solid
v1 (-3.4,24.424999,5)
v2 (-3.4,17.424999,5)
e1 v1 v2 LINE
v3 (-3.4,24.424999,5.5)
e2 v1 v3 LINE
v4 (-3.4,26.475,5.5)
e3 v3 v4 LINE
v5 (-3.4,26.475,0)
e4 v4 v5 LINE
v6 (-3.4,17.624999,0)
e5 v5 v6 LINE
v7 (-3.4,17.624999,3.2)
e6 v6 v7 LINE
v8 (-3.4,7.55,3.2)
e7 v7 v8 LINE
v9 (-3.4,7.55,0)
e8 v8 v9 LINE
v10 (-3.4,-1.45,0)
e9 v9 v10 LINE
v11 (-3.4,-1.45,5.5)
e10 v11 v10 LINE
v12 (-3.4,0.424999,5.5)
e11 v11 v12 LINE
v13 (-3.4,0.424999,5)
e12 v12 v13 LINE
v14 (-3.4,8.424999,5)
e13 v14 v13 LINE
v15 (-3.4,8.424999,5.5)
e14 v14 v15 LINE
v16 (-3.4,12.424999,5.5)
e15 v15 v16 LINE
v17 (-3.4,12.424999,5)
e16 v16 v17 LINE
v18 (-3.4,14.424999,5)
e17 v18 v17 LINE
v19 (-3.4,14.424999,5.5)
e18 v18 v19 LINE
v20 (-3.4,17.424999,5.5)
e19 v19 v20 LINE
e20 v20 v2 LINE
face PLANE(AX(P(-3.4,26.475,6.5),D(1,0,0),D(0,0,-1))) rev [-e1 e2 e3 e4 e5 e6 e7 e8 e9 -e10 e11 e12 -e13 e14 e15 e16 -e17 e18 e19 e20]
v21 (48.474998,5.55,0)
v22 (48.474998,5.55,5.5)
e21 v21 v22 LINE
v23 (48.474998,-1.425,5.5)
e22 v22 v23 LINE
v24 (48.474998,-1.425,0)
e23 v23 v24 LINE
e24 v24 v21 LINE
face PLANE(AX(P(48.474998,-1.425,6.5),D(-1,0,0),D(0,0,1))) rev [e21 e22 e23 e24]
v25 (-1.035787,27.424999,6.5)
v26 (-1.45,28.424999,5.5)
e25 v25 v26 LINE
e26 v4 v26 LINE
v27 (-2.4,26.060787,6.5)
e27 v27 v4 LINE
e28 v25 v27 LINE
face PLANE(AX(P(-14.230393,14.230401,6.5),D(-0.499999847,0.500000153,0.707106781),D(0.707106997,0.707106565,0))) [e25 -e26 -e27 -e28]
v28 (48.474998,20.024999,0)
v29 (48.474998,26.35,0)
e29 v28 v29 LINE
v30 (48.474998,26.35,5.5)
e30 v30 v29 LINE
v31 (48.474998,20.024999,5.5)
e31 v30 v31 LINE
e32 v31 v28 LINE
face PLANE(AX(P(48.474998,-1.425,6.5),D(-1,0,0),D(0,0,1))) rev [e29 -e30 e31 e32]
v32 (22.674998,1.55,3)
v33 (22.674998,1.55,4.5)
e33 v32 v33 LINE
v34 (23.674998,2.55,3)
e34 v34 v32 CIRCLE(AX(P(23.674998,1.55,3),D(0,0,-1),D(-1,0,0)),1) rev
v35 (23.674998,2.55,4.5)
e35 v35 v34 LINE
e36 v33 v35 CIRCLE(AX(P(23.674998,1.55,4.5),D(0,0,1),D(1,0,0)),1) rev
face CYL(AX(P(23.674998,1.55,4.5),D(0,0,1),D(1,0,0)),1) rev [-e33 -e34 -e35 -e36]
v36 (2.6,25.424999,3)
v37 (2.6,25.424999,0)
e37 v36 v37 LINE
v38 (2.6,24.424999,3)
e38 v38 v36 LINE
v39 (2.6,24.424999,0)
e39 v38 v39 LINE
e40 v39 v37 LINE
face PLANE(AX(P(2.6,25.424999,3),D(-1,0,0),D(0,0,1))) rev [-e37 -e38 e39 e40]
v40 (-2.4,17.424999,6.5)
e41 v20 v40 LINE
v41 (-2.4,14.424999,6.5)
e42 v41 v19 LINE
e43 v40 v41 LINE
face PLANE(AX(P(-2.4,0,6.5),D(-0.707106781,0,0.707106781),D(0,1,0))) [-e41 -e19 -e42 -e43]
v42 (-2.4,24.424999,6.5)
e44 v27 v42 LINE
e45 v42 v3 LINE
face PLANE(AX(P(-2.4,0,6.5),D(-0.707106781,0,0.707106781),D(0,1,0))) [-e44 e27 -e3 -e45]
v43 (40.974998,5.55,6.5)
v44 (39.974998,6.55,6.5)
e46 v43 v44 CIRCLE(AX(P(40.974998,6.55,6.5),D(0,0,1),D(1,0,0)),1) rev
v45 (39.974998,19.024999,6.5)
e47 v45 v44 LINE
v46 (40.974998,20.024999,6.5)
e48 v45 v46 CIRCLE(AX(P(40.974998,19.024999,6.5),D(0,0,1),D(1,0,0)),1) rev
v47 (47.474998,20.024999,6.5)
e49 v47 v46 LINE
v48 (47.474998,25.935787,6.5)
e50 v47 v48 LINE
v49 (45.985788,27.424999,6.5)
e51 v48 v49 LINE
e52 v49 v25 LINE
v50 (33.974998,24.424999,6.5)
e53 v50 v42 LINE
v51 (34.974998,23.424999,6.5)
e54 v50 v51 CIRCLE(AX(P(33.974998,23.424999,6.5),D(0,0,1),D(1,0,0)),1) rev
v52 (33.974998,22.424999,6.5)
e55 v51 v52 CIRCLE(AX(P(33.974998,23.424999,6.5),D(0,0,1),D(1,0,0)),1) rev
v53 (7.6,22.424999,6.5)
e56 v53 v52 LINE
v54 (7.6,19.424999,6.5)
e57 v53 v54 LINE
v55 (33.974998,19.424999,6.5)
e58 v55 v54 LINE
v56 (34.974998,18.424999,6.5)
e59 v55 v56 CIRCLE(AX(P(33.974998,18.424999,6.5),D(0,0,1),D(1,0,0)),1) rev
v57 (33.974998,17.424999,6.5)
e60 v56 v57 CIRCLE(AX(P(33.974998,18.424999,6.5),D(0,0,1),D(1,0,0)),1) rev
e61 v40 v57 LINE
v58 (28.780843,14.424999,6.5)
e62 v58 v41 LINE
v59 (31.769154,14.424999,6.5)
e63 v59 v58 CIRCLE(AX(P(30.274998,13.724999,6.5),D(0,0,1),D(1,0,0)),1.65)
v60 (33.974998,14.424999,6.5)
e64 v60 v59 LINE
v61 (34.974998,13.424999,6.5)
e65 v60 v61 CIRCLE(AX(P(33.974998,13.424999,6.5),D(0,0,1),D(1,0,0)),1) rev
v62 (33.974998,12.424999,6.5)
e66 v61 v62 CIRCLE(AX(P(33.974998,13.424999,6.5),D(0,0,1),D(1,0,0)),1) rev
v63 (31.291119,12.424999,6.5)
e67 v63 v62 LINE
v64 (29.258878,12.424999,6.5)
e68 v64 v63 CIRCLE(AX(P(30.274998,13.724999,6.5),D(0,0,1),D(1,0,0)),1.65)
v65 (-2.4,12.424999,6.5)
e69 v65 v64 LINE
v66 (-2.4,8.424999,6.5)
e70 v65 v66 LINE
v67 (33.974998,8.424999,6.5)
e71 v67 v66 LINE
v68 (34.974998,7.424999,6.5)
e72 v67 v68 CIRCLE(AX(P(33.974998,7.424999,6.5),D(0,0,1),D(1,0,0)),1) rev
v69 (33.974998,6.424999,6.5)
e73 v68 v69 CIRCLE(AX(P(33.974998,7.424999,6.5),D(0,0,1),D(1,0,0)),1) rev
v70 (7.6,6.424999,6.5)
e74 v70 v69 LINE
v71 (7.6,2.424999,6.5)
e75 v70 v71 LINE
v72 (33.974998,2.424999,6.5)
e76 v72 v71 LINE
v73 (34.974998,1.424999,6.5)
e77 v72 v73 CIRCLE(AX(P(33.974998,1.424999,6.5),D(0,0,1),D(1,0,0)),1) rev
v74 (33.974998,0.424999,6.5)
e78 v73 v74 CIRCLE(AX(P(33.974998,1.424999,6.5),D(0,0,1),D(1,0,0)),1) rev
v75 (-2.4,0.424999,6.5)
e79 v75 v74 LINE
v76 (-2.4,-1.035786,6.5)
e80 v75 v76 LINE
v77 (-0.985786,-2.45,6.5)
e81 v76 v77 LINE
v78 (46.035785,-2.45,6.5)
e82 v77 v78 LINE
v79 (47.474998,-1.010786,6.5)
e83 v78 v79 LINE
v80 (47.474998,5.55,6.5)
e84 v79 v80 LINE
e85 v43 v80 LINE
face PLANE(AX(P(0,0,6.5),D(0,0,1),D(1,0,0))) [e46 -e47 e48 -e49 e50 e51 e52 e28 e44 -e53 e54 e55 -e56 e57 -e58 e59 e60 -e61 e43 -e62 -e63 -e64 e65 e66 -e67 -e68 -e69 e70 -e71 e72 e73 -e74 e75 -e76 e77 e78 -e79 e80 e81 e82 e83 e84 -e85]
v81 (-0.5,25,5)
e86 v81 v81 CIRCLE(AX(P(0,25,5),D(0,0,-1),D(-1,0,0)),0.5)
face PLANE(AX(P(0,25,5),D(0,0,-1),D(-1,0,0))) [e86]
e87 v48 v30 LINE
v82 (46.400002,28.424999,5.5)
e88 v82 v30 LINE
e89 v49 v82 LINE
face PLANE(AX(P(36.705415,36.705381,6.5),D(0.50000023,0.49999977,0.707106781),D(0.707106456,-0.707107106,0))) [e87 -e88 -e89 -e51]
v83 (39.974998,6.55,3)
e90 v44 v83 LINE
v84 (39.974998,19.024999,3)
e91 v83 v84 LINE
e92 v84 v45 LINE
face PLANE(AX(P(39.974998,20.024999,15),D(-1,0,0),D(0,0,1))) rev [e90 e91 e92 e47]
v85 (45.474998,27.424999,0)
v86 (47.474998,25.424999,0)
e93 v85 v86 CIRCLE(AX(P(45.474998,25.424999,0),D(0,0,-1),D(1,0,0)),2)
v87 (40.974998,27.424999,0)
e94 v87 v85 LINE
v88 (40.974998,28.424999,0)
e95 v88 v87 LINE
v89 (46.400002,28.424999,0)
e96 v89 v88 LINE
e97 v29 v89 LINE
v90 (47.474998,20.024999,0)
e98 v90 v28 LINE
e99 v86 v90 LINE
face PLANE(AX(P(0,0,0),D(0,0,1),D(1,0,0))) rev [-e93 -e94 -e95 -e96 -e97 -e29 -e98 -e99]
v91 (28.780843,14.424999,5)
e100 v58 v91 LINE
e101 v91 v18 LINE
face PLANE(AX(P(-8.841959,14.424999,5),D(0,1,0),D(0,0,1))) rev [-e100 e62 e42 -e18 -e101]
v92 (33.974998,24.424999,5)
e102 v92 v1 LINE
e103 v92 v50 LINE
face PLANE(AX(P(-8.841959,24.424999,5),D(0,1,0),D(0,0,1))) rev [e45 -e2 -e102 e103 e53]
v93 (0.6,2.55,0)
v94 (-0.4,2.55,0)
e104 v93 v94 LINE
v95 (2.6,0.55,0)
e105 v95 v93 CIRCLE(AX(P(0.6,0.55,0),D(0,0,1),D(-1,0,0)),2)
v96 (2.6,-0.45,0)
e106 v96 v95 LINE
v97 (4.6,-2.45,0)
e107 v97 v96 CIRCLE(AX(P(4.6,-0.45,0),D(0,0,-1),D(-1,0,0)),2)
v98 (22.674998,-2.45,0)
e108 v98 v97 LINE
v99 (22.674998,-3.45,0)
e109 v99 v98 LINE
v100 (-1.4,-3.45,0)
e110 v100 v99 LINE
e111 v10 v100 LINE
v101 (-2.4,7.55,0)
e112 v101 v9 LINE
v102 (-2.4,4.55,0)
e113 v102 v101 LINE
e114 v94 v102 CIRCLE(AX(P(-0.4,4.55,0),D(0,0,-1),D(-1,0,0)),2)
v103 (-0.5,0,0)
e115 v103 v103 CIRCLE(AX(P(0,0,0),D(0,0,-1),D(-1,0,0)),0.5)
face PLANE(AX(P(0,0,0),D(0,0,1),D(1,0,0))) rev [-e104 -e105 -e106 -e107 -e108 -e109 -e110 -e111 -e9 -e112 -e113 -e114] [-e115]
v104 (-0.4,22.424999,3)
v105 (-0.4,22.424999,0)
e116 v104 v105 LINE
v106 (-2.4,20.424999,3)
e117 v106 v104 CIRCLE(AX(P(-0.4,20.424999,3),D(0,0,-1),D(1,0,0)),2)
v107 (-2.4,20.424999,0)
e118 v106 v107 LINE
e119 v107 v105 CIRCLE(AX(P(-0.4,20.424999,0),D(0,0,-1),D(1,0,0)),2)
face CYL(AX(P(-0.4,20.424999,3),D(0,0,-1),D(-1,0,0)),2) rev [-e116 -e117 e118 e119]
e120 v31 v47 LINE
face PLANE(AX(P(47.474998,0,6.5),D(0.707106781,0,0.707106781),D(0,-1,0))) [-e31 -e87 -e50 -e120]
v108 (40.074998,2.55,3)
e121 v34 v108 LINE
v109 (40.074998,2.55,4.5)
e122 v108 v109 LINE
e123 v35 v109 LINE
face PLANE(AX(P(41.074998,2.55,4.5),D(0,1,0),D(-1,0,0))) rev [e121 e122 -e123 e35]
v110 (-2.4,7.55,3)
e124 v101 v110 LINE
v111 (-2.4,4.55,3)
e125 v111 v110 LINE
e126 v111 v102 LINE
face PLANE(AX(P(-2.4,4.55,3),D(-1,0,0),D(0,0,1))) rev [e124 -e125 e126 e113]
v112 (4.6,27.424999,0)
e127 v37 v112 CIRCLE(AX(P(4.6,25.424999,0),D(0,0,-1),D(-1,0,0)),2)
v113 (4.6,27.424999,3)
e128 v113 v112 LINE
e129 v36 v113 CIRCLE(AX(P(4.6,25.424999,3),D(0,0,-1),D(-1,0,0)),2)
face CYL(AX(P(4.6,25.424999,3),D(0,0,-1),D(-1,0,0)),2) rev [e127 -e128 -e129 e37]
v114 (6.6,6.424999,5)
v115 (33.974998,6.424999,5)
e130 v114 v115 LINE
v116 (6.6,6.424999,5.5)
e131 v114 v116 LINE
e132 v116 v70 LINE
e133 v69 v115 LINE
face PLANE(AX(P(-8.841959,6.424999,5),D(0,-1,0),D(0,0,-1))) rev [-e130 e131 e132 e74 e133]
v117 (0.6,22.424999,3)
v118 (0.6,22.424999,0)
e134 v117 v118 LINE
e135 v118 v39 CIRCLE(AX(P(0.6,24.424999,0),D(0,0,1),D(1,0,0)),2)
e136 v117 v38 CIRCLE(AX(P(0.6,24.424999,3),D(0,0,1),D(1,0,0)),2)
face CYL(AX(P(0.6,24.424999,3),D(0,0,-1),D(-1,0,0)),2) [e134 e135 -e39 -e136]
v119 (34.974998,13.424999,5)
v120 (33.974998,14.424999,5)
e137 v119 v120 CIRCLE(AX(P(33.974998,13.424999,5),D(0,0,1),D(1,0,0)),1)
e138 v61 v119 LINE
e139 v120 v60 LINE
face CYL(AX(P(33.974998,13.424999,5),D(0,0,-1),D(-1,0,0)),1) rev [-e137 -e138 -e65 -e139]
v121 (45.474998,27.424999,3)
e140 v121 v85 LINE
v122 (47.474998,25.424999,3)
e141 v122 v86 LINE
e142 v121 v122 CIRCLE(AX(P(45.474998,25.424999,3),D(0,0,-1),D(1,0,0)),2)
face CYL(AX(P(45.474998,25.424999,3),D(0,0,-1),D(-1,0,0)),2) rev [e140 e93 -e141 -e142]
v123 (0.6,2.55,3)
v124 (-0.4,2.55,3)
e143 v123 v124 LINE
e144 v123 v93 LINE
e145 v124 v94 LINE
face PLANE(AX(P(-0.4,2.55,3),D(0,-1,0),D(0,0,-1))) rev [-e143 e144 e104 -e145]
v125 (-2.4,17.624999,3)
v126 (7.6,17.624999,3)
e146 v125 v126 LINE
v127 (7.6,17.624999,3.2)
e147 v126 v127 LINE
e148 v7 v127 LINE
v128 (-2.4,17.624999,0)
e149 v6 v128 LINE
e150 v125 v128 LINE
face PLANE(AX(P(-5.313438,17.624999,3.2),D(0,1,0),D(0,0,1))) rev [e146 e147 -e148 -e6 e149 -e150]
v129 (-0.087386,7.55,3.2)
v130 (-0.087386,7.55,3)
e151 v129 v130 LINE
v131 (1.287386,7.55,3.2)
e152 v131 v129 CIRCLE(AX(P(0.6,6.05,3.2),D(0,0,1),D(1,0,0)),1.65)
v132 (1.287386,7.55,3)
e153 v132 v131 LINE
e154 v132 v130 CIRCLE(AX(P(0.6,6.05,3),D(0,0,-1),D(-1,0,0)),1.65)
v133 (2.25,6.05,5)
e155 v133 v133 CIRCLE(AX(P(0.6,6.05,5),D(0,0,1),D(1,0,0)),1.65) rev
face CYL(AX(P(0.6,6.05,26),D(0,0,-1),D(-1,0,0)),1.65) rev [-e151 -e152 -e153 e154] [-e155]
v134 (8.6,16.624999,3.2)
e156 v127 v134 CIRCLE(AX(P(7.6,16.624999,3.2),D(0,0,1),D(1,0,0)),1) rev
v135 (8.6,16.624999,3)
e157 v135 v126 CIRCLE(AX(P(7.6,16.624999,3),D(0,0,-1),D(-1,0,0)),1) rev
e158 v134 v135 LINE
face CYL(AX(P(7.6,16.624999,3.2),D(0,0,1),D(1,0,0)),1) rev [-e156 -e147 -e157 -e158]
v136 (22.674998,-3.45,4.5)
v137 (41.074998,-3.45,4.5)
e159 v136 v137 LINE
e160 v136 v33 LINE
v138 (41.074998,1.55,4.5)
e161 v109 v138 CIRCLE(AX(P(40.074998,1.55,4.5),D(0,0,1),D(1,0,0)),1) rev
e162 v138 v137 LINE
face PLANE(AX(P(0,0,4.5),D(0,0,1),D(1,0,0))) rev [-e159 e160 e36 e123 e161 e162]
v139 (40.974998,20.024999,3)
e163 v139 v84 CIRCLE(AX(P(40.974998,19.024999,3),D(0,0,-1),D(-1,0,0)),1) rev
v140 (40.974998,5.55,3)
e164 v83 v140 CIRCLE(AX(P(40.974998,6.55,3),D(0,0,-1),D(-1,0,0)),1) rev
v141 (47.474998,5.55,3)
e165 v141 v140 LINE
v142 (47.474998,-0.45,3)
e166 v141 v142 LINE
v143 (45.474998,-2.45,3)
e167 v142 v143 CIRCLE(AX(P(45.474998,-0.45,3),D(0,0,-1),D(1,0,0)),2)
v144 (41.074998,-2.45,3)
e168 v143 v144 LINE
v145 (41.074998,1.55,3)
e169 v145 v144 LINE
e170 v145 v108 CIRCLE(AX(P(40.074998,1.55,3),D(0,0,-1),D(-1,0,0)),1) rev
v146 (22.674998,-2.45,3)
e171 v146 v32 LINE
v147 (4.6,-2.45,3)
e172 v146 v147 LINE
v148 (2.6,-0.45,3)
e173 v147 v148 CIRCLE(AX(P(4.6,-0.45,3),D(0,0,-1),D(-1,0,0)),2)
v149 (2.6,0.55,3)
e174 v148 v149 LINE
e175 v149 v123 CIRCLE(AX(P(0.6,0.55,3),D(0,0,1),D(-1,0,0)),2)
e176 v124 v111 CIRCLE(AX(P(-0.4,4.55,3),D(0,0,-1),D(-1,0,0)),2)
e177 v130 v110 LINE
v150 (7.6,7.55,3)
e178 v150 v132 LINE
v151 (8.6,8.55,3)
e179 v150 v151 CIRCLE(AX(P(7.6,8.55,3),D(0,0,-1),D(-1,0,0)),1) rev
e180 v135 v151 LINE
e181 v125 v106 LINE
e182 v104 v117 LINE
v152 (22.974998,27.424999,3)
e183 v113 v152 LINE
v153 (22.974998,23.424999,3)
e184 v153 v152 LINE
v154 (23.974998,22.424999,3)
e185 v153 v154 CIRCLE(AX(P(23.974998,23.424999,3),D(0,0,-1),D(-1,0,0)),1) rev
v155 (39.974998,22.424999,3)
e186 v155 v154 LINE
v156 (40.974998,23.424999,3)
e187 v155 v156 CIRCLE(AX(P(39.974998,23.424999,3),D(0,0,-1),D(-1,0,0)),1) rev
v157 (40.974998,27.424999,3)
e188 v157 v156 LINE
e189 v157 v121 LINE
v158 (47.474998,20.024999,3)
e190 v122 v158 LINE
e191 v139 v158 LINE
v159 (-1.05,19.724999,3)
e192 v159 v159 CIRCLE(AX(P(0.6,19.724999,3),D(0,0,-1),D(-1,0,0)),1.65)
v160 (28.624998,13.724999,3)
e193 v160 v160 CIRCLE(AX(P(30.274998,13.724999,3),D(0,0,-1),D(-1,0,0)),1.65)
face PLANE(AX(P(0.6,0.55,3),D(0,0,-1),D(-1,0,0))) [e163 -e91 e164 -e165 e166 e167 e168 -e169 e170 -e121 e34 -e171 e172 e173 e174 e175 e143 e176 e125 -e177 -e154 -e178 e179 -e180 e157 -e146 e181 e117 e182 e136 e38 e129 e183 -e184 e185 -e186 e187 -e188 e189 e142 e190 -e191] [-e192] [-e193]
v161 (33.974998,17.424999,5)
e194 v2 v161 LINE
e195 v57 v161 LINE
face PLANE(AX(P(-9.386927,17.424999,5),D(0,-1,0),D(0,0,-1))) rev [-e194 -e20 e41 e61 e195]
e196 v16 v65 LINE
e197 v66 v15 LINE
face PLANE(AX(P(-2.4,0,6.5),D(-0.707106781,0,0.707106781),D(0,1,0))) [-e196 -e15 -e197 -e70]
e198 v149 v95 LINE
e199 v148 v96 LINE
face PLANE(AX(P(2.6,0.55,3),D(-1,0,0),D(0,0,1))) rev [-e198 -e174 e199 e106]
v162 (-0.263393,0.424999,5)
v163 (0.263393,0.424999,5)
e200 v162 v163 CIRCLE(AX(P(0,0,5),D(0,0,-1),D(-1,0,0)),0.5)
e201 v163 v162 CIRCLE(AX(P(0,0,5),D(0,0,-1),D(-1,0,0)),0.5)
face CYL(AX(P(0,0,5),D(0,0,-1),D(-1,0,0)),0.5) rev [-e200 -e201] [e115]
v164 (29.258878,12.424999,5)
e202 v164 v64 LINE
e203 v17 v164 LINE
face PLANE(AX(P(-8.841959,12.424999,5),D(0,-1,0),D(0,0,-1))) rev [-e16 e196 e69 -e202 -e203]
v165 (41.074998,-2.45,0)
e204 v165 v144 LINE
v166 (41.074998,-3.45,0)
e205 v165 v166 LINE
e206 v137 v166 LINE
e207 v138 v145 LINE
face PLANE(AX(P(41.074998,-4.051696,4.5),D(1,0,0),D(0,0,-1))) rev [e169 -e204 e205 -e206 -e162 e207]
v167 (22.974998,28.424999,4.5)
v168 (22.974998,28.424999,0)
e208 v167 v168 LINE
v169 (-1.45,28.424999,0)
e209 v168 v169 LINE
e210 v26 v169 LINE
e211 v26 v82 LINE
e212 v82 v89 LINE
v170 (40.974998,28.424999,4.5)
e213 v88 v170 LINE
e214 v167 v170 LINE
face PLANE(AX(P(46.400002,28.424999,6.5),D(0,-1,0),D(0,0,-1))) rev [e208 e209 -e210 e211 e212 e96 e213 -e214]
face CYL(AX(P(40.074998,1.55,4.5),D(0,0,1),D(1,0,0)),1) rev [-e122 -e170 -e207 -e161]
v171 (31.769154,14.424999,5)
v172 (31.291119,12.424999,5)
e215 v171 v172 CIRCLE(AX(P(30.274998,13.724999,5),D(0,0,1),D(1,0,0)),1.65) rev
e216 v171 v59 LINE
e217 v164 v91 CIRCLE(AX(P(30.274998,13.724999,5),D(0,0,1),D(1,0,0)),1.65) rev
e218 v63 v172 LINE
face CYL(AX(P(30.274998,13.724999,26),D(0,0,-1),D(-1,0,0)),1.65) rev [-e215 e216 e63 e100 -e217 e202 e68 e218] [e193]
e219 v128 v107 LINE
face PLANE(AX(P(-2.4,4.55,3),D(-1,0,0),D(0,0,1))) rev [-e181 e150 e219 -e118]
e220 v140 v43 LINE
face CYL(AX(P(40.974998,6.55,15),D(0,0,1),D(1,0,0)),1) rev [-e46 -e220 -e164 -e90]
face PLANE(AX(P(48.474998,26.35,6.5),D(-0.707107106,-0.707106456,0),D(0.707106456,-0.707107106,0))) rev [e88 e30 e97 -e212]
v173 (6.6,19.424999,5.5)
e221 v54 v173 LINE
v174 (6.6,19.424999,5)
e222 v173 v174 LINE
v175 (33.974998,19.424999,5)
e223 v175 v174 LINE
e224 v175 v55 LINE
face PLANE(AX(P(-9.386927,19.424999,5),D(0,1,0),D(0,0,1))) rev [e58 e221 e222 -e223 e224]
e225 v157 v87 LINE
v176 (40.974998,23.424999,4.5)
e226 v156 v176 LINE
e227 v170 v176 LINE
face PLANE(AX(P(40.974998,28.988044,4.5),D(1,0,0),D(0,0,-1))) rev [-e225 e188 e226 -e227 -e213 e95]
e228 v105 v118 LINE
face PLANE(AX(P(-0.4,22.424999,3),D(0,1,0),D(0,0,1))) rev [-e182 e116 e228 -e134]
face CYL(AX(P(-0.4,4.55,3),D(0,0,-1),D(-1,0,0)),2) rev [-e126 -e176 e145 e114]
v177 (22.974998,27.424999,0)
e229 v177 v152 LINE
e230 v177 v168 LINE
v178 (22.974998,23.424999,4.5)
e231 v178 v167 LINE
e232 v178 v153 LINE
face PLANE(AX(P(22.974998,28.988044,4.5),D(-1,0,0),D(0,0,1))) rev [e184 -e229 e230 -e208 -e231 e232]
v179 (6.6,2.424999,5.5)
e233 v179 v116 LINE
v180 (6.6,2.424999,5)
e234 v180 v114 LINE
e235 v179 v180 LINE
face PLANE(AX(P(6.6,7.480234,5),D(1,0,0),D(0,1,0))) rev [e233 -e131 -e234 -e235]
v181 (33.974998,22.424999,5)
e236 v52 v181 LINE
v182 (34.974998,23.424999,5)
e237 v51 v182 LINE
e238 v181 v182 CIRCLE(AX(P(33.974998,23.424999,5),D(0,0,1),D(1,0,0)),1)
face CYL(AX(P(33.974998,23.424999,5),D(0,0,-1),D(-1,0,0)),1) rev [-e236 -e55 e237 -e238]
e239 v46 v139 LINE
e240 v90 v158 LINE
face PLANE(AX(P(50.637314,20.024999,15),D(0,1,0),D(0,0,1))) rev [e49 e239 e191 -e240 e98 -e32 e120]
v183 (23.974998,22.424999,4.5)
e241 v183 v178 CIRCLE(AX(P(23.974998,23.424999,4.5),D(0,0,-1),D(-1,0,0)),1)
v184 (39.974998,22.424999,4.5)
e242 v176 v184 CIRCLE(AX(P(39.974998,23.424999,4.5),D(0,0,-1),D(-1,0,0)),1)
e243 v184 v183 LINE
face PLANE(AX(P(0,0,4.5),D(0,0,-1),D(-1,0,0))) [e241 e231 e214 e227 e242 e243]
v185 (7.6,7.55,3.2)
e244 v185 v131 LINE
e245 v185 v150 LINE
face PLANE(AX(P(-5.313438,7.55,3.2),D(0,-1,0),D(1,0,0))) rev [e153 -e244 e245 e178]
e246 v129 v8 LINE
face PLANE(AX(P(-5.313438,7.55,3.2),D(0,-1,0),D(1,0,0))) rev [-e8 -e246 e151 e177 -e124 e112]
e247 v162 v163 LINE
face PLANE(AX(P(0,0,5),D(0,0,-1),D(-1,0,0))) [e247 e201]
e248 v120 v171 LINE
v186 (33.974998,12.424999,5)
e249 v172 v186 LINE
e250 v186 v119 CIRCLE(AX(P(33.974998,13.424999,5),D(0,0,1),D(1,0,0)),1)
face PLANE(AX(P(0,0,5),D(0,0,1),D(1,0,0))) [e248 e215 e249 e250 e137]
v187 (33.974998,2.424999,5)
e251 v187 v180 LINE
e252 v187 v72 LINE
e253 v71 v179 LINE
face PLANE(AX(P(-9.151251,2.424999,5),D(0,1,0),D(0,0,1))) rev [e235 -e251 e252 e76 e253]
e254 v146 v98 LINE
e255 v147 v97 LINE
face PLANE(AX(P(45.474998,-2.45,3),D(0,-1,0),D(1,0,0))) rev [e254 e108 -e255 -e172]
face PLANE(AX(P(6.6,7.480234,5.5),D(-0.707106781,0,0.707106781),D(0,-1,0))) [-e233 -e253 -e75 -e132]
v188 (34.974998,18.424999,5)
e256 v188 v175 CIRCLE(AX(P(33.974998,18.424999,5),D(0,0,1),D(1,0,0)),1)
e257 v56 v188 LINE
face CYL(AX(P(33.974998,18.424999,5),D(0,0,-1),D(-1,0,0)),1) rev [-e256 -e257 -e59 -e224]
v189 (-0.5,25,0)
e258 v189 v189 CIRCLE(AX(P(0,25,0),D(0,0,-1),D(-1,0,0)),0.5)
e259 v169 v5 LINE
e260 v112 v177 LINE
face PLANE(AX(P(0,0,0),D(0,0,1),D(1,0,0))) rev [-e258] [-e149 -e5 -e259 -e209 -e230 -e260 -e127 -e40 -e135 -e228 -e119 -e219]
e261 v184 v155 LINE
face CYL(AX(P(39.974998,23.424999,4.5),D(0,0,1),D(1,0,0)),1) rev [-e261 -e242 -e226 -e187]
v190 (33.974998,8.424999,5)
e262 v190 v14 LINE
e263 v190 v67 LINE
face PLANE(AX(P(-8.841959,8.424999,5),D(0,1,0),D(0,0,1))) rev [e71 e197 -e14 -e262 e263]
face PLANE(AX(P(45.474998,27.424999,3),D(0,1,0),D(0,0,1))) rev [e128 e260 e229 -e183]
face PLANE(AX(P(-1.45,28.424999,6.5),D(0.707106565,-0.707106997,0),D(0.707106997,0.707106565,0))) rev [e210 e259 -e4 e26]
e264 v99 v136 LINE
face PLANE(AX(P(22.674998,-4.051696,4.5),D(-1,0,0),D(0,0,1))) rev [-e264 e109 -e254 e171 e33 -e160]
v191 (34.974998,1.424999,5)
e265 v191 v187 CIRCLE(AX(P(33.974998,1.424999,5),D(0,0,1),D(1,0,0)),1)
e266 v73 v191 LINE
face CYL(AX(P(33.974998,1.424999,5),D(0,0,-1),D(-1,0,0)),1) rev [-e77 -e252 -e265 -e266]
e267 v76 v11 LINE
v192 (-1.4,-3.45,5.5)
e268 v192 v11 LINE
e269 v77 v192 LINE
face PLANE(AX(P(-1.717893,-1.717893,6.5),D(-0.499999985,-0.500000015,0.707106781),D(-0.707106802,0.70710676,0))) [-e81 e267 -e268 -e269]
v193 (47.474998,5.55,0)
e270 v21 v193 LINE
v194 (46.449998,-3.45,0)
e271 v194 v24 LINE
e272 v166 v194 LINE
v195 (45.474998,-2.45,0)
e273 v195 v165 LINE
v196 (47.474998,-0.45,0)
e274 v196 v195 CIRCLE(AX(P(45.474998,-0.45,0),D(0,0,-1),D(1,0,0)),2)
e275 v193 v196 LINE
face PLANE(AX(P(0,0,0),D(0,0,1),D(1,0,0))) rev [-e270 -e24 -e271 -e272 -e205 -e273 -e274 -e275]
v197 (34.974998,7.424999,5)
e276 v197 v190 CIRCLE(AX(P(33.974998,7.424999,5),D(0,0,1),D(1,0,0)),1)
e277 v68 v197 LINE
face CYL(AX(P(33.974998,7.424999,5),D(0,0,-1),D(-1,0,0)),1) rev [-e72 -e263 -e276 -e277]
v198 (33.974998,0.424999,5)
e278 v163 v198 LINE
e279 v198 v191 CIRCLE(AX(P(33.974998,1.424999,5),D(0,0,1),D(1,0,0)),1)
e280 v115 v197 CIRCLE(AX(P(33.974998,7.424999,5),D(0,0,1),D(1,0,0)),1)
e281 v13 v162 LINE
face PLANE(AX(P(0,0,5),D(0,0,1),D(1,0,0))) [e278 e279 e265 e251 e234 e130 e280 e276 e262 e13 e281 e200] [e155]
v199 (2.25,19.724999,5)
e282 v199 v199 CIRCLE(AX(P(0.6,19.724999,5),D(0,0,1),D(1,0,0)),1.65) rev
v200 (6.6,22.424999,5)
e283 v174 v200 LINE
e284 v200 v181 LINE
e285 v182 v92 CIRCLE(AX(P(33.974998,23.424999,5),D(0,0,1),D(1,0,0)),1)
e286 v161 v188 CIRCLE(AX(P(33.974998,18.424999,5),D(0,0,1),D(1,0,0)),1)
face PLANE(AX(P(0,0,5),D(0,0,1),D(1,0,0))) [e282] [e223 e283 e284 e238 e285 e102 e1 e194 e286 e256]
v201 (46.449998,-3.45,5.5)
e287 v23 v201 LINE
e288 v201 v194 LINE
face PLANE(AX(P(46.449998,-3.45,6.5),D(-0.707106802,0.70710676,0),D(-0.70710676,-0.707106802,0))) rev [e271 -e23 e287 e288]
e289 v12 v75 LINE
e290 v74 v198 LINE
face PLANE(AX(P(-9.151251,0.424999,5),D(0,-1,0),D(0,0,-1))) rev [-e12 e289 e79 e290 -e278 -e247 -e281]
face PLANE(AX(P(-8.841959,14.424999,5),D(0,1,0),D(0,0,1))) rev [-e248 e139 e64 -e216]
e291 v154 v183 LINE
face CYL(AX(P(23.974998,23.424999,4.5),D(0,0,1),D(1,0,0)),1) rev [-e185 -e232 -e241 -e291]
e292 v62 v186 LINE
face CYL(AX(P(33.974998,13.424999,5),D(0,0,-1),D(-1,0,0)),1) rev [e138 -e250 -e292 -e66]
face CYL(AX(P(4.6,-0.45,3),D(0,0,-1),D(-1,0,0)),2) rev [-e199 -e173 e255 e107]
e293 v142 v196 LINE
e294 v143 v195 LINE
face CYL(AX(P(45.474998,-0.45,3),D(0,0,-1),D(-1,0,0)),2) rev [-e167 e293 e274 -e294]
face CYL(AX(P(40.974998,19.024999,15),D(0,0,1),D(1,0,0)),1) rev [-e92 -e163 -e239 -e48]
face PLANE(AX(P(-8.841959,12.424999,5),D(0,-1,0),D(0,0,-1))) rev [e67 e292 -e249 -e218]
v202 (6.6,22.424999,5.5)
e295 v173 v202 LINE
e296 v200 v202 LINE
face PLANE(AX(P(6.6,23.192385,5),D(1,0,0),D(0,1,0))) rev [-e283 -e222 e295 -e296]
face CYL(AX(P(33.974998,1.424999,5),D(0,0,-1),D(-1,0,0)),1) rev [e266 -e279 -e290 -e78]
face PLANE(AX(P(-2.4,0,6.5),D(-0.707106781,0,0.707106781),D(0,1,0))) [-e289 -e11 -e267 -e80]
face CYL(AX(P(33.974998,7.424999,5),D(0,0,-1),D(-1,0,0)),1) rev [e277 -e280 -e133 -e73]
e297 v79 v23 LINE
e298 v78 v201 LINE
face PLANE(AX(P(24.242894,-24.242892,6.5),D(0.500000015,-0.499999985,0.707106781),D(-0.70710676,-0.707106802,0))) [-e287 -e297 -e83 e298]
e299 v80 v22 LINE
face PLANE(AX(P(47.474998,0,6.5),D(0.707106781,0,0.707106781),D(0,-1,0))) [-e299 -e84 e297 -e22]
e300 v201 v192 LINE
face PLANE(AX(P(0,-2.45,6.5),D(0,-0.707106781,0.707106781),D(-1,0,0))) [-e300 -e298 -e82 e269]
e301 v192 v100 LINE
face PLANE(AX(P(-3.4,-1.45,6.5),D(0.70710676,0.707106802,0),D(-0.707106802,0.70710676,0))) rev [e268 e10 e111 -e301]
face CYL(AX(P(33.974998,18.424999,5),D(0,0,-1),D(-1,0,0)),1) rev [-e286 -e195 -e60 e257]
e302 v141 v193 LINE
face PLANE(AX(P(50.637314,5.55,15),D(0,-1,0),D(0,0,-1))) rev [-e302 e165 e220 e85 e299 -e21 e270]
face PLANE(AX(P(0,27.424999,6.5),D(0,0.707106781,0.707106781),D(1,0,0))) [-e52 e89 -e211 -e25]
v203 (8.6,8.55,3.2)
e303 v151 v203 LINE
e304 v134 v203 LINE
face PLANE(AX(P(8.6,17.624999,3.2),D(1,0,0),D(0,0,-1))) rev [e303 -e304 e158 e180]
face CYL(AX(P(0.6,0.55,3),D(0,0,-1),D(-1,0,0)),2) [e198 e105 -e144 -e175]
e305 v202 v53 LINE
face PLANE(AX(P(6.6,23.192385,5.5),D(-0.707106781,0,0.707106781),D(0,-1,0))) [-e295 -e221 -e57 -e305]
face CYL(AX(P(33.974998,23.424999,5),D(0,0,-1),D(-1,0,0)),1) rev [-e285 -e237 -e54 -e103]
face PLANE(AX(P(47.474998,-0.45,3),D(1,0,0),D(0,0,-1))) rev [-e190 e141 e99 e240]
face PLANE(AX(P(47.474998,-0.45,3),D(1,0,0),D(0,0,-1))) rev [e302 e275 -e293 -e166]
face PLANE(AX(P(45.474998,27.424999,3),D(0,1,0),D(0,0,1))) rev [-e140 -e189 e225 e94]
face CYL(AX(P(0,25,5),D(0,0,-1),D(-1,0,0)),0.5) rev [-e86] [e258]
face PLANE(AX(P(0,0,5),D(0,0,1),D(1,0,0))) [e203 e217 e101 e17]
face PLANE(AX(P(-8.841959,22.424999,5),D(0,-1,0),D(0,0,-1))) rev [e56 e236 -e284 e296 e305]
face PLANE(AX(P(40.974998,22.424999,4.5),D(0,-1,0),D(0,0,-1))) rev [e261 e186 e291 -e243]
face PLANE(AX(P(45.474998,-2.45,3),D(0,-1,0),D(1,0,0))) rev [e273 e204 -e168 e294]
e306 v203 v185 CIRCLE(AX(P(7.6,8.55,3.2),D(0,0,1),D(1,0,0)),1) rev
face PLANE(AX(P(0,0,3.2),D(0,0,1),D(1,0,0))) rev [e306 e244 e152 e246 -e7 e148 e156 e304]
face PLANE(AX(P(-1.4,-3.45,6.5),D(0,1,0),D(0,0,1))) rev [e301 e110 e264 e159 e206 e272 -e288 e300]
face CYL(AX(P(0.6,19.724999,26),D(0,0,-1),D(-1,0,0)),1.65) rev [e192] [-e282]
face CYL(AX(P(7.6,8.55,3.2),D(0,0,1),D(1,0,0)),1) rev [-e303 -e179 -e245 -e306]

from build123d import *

# Parameters (mm, degrees)
EXTRUDE_2_DEPTH     = 6.5
CUT_EXTRUDE_1_DEPTH = 3
SKETCH_4_R          = 0.5
CUT_EXTRUDE_2_DEPTH = 5
SKETCH_5_W          = 10.662315839
SKETCH_5_H          = 14.474999285
CUT_EXTRUDE_3_DEPTH = 15
SKETCH_6_W          = 18
SKETCH_6_H          = 6.5630452
SKETCH_6_W_2        = 18.4
SKETCH_6_H_2        = 6.601696298
CUT_EXTRUDE_4_DEPTH = 4.5
SKETCH_8_W          = 13.913437684
SKETCH_8_H          = 10.074999285
CUT_EXTRUDE_5_DEPTH = 3.2
SKETCH_9_R          = 1.65
CUT_EXTRUDE_6_DEPTH = 23
CHAMFER_2_SIZE      = 1
FILLET_1_R          = 1
SKETCH_20_W         = 43.816957605
SKETCH_20_H         = 2
SKETCH_20_W_2       = 44.126249409
SKETCH_20_W_3       = 44.36192542
CUT_EXTRUDE_7_DEPTH = 1.5
FILLET_2_R          = 1
SKETCH_21_W         = 13.231285314
SKETCH_21_H         = 4.572576543
SKETCH_21_W_2       = 12.647552139
SKETCH_21_H_2       = 6.080553912
CUT_EXTRUDE_8_DEPTH = 1.5
CHAMFER_3_SIZE      = 1


with BuildPart() as part:
    # Эскиз2 → Бобышка-Вытянуть2 (new body)
    with BuildSketch(Plane.XY):
        Polygon((-1.450000048, 28.424999237), (-3.400000095, 26.475000381), (-3.400000095, -1.450000048), (-1.399999976, -3.450000048), (46.449998499, -3.450000048), (48.474998474, -1.424999952), (48.474998474, 26.350000381), (46.400001526, 28.424999237), align=None)
    extrude(amount=EXTRUDE_2_DEPTH)

    # Эскиз3 → Вырез-Вытянуть1 (cut)
    with BuildSketch(Plane(origin=(0, 0, 0), x_dir=(-1, 0, 0), z_dir=(0, 0, -1))):
        with BuildLine():
            Line((-45.474998474, -2.450000048), (-4.599999905, -2.450000048))
            ThreePointArc((-4.599999905, -2.450000048), (-3.185786342, -1.86421361), (-2.599999905, -0.450000048))
            Line((-2.599999905, -0.450000048), (-2.599999905, 0.549999952))
            ThreePointArc((-2.599999905, 0.549999952), (-2.014213467, 1.964213515), (-0.599999905, 2.549999952))
            Line((-0.599999905, 2.549999952), (0.400000095, 2.549999952))
            ThreePointArc((0.400000095, 2.549999952), (1.814213658, 3.13578639), (2.400000095, 4.549999952))
            Line((2.400000095, 4.549999952), (2.400000095, 20.424999237))
            ThreePointArc((2.400000095, 20.424999237), (1.814213658, 21.839212799), (0.400000095, 22.424999237))
            Line((0.400000095, 22.424999237), (-0.599999905, 22.424999237))
            ThreePointArc((-0.599999905, 22.424999237), (-2.014213467, 23.010785675), (-2.599999905, 24.424999237))
            Line((-2.599999905, 24.424999237), (-2.599999905, 25.424999237))
            ThreePointArc((-2.599999905, 25.424999237), (-3.185786342, 26.839212799), (-4.599999905, 27.424999237))
            Line((-4.599999905, 27.424999237), (-45.474998474, 27.424999237))
            ThreePointArc((-45.474998474, 27.424999237), (-46.889212036, 26.839212799), (-47.474998474, 25.424999237))
            Line((-47.474998474, 25.424999237), (-47.474998474, -0.450000048))
            ThreePointArc((-47.474998474, -0.450000048), (-46.889212036, -1.86421361), (-45.474998474, -2.450000048))
        make_face()
    extrude(amount=-CUT_EXTRUDE_1_DEPTH, mode=Mode.SUBTRACT)

    # Эскиз4 → Вырез-Вытянуть2 (cut)
    with BuildSketch(Plane(origin=(0, 0, 0), x_dir=(-1, 0, 0), z_dir=(0, 0, -1))):
        with Locations((0, 25)):
            Circle(SKETCH_4_R)
        Circle(SKETCH_4_R)
    extrude(amount=-CUT_EXTRUDE_2_DEPTH, mode=Mode.SUBTRACT)

    # Эскиз5 → Вырез-Вытянуть3 (cut)
    with BuildSketch(Plane(origin=(0, 0, 0), x_dir=(-1, 0, 0), z_dir=(0, 0, -1))):
        with Locations((-45.306156394, 12.787499595)):
            Rectangle(SKETCH_5_W, SKETCH_5_H)
    extrude(amount=-CUT_EXTRUDE_3_DEPTH, mode=Mode.SUBTRACT)

    # Эскиз6 → Вырез-Вытянуть4 (cut)
    with BuildSketch(Plane(origin=(0, 0, 0), x_dir=(-1, 0, 0), z_dir=(0, 0, -1))):
        with Locations((-31.974998474, 25.706521837)):
            Rectangle(SKETCH_6_W, SKETCH_6_H)
        with Locations((-31.874998474, -0.750848197)):
            Rectangle(SKETCH_6_W_2, SKETCH_6_H_2)
    extrude(amount=-CUT_EXTRUDE_4_DEPTH, mode=Mode.SUBTRACT)

    # Эскиз8 → Вырез-Вытянуть5 (cut)
    with BuildSketch(Plane(origin=(0, 0, 0), x_dir=(-1, 0, 0), z_dir=(0, 0, -1))):
        with Locations((-1.643281063, 12.587499595)):
            Rectangle(SKETCH_8_W, SKETCH_8_H)
    extrude(amount=-CUT_EXTRUDE_5_DEPTH, mode=Mode.SUBTRACT)

    # Эскиз9 → Вырез-Вытянуть6 (cut)
    with BuildSketch(Plane(origin=(0, 0, 3), x_dir=(-1, 0, 0), z_dir=(0, 0, -1))):
        with Locations((-30.274998474, 13.724999237)):
            Circle(SKETCH_9_R)
        with Locations((-0.599999905, 19.724999237)):
            Circle(SKETCH_9_R)
        with Locations(Location((-0.599999905, 6.049999952, 0), (0, 0, 65.380022671))):
            Circle(SKETCH_9_R)
    extrude(amount=-CUT_EXTRUDE_6_DEPTH, mode=Mode.SUBTRACT)

    # Фаска2
    chamfer_2_edges = [part.edges().sort_by_distance(p)[0] for p in [
        (-3.400000095, 12.512500167, 6.5),
        (-2.400000036, -2.450000048, 6.5),
        (22.524999262, -3.450000048, 6.5),
        (47.462498487, -2.4375, 6.5),
        (48.474998474, 2.0625, 6.5),
        (47.4375, 27.387499809, 6.5),
        (22.475000739, 28.424999237, 6.5),
        (48.474998474, 23.187499809, 6.5),
        (-2.425000072, 27.449999809, 6.5),
    ]]
    chamfer(chamfer_2_edges, length=CHAMFER_2_SIZE)

    # Скругление1
    fillet_1_edges = [part.edges().sort_by_distance(p)[0] for p in [
        (40.974998474, 22.424999237, 3.75),
        (22.974998474, 22.424999237, 3.75),
        (22.674998474, 2.549999952, 3.75),
        (41.074998474, 2.549999952, 3.75),
        (8.599999905, 17.624999237, 3.1),
        (8.599999905, 7.549999952, 3.1),
        (39.974998474, 5.549999952, 4.75),
        (39.974998474, 20.024999237, 4.75),
    ]]
    fillet(fillet_1_edges, radius=FILLET_1_R)

    # Эскиз20 → Вырез-Вытянуть7 (cut)
    with BuildSketch(Plane.XY.offset(6.5)):
        with Locations((13.066519672, 23.424999237)):
            Rectangle(SKETCH_20_W, SKETCH_20_H)
        with Locations((13.066519672, 13.424999237)):
            Rectangle(SKETCH_20_W, SKETCH_20_H)
        with Locations((12.91187377, 1.424999237)):
            Rectangle(SKETCH_20_W_2, SKETCH_20_H)
        with Locations((13.066519672, 7.424999237)):
            Rectangle(SKETCH_20_W, SKETCH_20_H)
        with Locations((12.794035764, 18.424999237)):
            Rectangle(SKETCH_20_W_3, SKETCH_20_H)
    extrude(amount=-CUT_EXTRUDE_7_DEPTH, mode=Mode.SUBTRACT)

    # Скругление2
    fillet_2_edges = [part.edges().sort_by_distance(p)[0] for p in [
        (34.974998474, 0.424999237, 5.75),
        (34.974998474, 6.424999237, 5.75),
        (34.974998474, 12.424999237, 5.75),
        (34.974998474, 17.424999237, 5.75),
        (34.974998474, 2.424999237, 5.75),
        (34.974998474, 8.424999237, 5.75),
        (34.974998474, 14.424999237, 5.75),
        (34.974998474, 19.424999237, 5.75),
        (34.974998474, 22.424999237, 5.75),
        (34.974998474, 24.424999237, 5.75),
    ]]
    fillet(fillet_2_edges, radius=FILLET_2_R - 0.0001)  # a hair under: the kernel refuses the full size

    # Эскиз21 → Вырез-Вытянуть8 (cut)
    with BuildSketch(Plane.XY.offset(6.5)):
        with Locations((-0.015642752, 20.906096965)):
            Rectangle(SKETCH_21_W, SKETCH_21_H)
        with Locations((0.276223836, 4.43995697)):
            Rectangle(SKETCH_21_W_2, SKETCH_21_H_2)
    extrude(amount=-CUT_EXTRUDE_8_DEPTH, mode=Mode.SUBTRACT)

    # Фаска3
    chamfer_3_edges = [part.edges().sort_by_distance(p)[0] for p in [
        (6.599999905, 20.924999237, 6.5),
        (6.599999905, 4.424999237, 6.5),
    ]]
    chamfer(chamfer_3_edges, length=CHAMFER_3_SIZE)


solid = part.part
